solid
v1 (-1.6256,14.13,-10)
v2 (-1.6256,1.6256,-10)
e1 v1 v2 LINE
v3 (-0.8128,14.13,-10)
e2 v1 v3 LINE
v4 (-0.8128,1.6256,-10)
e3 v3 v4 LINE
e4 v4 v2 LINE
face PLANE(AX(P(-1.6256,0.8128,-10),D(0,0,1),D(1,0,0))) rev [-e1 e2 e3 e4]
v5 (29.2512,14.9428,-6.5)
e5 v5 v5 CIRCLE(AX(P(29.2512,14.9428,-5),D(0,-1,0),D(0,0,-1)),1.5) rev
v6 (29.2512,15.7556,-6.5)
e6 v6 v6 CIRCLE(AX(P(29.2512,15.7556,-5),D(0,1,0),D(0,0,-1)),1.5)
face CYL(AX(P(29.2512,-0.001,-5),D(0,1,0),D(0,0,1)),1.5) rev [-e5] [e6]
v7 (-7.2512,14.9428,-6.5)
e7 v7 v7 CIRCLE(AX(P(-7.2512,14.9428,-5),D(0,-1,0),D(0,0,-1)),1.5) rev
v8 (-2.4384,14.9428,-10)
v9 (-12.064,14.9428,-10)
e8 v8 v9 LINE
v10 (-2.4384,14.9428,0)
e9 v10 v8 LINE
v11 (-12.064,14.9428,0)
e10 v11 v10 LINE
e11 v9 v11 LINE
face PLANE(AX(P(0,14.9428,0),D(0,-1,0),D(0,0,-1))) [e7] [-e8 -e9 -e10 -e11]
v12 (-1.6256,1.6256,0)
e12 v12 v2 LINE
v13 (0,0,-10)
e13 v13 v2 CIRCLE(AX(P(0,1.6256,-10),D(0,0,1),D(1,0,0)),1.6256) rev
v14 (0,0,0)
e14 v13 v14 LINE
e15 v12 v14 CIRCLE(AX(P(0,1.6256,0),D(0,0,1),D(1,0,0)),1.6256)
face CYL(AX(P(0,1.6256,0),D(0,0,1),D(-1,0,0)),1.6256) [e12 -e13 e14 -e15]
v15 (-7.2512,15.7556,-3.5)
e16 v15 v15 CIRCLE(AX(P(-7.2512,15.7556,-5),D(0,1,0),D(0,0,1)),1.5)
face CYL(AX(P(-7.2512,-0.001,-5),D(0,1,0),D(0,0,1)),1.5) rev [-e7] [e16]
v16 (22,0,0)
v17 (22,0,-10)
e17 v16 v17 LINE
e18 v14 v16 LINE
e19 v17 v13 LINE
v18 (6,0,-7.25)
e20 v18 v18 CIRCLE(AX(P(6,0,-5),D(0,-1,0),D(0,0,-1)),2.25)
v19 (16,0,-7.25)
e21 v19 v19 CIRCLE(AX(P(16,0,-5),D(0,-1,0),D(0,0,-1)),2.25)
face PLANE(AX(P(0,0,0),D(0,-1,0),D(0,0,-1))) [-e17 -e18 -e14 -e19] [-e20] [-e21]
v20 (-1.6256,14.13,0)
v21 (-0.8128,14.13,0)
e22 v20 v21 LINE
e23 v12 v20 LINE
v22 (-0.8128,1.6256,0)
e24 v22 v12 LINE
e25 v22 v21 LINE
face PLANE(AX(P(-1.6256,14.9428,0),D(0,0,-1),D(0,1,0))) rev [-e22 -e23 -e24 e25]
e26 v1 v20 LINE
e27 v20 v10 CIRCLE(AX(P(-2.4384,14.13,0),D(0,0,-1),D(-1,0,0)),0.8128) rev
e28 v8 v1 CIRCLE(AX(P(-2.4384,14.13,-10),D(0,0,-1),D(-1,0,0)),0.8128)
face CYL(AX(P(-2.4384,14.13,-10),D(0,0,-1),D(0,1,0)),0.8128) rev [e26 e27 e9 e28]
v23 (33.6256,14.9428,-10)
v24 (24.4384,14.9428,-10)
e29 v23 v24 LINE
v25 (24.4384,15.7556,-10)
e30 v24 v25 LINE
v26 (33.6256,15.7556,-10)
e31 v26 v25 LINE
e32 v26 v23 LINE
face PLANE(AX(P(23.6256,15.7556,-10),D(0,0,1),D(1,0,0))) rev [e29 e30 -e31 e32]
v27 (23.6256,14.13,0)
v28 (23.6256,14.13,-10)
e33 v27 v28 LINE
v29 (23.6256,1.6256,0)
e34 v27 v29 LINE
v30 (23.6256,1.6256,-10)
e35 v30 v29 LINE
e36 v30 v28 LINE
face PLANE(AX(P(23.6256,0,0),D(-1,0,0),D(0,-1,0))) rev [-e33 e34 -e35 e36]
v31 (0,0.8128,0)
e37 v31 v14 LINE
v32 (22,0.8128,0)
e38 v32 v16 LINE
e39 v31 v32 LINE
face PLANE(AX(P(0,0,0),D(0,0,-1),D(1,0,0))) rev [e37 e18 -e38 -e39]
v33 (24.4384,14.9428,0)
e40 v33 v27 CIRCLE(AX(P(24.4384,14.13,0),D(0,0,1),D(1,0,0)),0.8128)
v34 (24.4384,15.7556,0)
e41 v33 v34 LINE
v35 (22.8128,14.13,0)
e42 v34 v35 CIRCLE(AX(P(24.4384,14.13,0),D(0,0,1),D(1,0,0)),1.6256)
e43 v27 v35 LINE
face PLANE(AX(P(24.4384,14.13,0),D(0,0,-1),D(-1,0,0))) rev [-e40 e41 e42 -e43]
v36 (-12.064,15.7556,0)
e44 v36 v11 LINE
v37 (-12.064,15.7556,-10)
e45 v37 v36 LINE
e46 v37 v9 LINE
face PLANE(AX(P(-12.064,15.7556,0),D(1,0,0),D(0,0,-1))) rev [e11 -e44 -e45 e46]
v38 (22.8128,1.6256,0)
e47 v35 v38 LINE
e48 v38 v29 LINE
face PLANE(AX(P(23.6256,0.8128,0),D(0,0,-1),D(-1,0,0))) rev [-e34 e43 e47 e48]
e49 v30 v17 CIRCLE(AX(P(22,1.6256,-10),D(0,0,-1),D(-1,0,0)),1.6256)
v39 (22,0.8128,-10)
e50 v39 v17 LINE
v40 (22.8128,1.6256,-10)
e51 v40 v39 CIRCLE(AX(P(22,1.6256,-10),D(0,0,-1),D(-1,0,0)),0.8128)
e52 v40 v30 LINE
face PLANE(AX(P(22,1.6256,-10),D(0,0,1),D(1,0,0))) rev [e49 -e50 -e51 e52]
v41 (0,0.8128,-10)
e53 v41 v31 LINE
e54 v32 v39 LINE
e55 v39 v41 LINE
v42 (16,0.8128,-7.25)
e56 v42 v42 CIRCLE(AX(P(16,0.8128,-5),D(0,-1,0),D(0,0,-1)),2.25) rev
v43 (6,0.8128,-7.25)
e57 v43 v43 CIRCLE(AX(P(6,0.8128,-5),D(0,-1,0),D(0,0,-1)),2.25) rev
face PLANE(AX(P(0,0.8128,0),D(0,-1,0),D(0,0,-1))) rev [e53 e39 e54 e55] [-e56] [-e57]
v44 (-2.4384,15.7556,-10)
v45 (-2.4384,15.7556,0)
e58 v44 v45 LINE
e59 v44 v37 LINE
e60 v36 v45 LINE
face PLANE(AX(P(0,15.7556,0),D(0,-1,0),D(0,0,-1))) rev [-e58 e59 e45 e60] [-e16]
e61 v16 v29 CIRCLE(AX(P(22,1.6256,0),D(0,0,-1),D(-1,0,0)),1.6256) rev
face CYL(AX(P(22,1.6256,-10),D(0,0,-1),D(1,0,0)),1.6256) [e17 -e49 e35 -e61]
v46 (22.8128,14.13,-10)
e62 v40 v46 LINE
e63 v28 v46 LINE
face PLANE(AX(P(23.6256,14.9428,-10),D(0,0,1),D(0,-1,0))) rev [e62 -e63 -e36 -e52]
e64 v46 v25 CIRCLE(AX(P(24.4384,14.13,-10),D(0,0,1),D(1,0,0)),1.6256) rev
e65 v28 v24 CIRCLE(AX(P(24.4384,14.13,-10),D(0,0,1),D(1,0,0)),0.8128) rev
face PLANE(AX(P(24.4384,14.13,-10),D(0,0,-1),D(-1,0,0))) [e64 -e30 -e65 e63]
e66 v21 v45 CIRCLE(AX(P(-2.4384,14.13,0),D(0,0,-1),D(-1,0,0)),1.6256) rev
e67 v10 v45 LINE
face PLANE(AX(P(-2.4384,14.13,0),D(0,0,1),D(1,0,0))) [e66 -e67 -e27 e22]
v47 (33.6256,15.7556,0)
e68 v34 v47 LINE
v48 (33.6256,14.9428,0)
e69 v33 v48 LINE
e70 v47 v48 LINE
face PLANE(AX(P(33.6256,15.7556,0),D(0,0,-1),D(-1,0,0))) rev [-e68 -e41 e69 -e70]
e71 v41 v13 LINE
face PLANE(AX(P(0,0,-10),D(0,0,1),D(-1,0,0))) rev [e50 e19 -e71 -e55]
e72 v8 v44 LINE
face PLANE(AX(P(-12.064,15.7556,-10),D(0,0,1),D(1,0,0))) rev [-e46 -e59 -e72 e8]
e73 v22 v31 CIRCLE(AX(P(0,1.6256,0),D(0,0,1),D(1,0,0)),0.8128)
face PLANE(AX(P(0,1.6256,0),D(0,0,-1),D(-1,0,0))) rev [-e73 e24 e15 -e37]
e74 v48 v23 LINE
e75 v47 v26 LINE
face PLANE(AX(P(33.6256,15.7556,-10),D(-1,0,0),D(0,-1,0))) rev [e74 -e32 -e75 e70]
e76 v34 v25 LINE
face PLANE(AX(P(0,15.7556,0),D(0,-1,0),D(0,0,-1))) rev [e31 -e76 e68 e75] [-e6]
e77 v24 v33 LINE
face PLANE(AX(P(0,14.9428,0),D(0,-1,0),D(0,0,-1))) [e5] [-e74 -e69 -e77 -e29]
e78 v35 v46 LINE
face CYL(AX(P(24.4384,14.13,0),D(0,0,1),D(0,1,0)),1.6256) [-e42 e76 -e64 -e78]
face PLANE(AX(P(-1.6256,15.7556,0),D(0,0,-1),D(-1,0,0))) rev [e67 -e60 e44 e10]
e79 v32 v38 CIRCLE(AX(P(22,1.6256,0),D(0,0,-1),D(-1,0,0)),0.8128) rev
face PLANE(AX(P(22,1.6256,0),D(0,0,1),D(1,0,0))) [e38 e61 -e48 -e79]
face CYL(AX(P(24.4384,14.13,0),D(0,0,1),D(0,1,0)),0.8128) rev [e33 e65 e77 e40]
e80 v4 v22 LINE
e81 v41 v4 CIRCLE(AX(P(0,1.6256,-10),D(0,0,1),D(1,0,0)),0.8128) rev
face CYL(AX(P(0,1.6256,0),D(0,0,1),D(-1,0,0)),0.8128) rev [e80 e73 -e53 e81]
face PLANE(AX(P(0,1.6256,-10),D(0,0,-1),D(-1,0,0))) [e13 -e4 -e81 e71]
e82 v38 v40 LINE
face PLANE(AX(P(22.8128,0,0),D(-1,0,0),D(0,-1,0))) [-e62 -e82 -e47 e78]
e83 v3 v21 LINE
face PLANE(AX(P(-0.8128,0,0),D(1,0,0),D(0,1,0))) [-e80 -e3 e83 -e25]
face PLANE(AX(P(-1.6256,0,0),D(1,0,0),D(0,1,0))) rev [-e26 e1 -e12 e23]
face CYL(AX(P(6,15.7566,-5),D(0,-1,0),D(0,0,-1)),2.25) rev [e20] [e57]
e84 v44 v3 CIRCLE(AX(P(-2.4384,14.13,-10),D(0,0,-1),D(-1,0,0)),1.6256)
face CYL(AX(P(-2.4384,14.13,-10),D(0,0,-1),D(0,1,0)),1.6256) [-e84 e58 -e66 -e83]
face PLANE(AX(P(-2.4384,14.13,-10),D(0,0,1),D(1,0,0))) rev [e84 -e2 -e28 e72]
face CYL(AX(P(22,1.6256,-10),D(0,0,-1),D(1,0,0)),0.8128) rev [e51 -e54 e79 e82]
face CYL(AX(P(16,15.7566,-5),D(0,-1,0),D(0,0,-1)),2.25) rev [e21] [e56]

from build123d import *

# Parameters (mm, degrees)
SKETCH2_W                    = 22
SKETCH2_H                    = 10
BOSS_EXTRUDE1_DEPTH          = 0.8128
EDGE_FLANGE1_DEPTH           = 10
EDGE_FLANGE2_DEPTH           = 10
EDGE_FLANGE3_STRIP_W         = 4.8768
EDGE_FLANGE3_STRIP_H         = 0.8128
EDGE_FLANGE3_STRIP_CUT_DEPTH = 10
EDGE_FLANGE3_DEPTH           = 10
EDGE_FLANGE4_STRIP_W         = 4.8768
EDGE_FLANGE4_STRIP_H         = 0.8128
EDGE_FLANGE4_STRIP_CUT_DEPTH = 10
EDGE_FLANGE4_DEPTH           = 10
CUT_EXTRUDE1_REACH           = 40.457
SKETCH21_R                   = 1.5
CUT_EXTRUDE2_REACH           = 40.457
SKETCH22_R                   = 2.25


# Sheet-metal steps are written as plain solids
with BuildPart() as part:
    # Sketch2 → Boss-Extrude1 (new body)
    with BuildSketch(Plane(origin=(0, 0, 0), x_dir=(1, 0, 0), z_dir=(0, 1, 0))):
        with Locations((11, 5)):
            Rectangle(SKETCH2_W, SKETCH2_H)
    extrude(amount=BOSS_EXTRUDE1_DEPTH)

    # Edge-Flange1 section (across the edge) → Edge-Flange1 (add)
    with BuildSketch(Plane(origin=(-0.8128, 0.8128, -10), x_dir=(1, 0, 0), z_dir=(0, 0, 1))):
        with BuildLine():
            Line((-0.8128, 0.8128), (-0.8128, 14.13))
            Line((-0.8128, 14.13), (0, 14.13))
            Line((0, 14.13), (0, 0.8128))
            ThreePointArc((0, 0.8128), (0.238063608, 0.238063608), (0.8128, 0))
            Line((0.8128, 0), (0.8128, -0.8128))
            ThreePointArc((0.8128, -0.8128), (-0.336672783, -0.336672783), (-0.8128, 0.8128))
        make_face()
    extrude(amount=EDGE_FLANGE1_DEPTH)

    # Edge-Flange2 section (across the edge) → Edge-Flange2 (add)
    with BuildSketch(Plane(origin=(22.8128, 0.8128, 0), x_dir=(-1, 0, 0), z_dir=(0, 0, -1))):
        with BuildLine():
            Line((-0.8128, 0.8128), (-0.8128, 14.13))
            Line((-0.8128, 14.13), (0, 14.13))
            Line((0, 14.13), (0, 0.8128))
            ThreePointArc((0, 0.8128), (0.238063608, 0.238063608), (0.8128, 0))
            Line((0.8128, 0), (0.8128, -0.8128))
            ThreePointArc((0.8128, -0.8128), (-0.336672783, -0.336672783), (-0.8128, 0.8128))
        make_face()
    extrude(amount=EDGE_FLANGE2_DEPTH)

    # Edge-Flange3 strip (across the edge) → Edge-Flange3 strip cut (cut)
    with BuildSketch(Plane(origin=(-1.6256, 14.9428, 0), x_dir=(0, -1, 0), z_dir=(0, 0, -1))):
        with Locations((-1.6256, -0.4064)):
            Rectangle(EDGE_FLANGE3_STRIP_W, EDGE_FLANGE3_STRIP_H)
    extrude(amount=EDGE_FLANGE3_STRIP_CUT_DEPTH, mode=Mode.SUBTRACT)

    # Edge-Flange3 section (across the edge) → Edge-Flange3 (add)
    with BuildSketch(Plane(origin=(-1.6256, 14.9428, 0), x_dir=(0, -1, 0), z_dir=(0, 0, -1))):
        with BuildLine():
            Line((-0.8128, 0.8128), (-0.8128, 10.4384))
            Line((-0.8128, 10.4384), (0, 10.4384))
            Line((0, 10.4384), (0, 0.8128))
            ThreePointArc((0, 0.8128), (0.238063608, 0.238063608), (0.8128, 0))
            Line((0.8128, 0), (0.8128, -0.8128))
            ThreePointArc((0.8128, -0.8128), (-0.336672783, -0.336672783), (-0.8128, 0.8128))
        make_face()
    extrude(amount=EDGE_FLANGE3_DEPTH)

    # Edge-Flange4 strip (across the edge) → Edge-Flange4 strip cut (cut)
    with BuildSketch(Plane(origin=(23.6256, 14.9428, -10), x_dir=(0, -1, 0), z_dir=(0, 0, 1))):
        with Locations((-1.6256, -0.4064)):
            Rectangle(EDGE_FLANGE4_STRIP_W, EDGE_FLANGE4_STRIP_H)
    extrude(amount=EDGE_FLANGE4_STRIP_CUT_DEPTH, mode=Mode.SUBTRACT)

    # Edge-Flange4 section (across the edge) → Edge-Flange4 (add)
    with BuildSketch(Plane(origin=(23.6256, 14.9428, -10), x_dir=(0, -1, 0), z_dir=(0, 0, 1))):
        with BuildLine():
            Line((-0.8128, 0.8128), (-0.8128, 10))
            Line((-0.8128, 10), (0, 10))
            Line((0, 10), (0, 0.8128))
            ThreePointArc((0, 0.8128), (0.238063608, 0.238063608), (0.8128, 0))
            Line((0.8128, 0), (0.8128, -0.8128))
            ThreePointArc((0.8128, -0.8128), (-0.336672783, -0.336672783), (-0.8128, 0.8128))
        make_face()
    extrude(amount=EDGE_FLANGE4_DEPTH)

    # Sketch21 → Cut-Extrude1 (cut, up to next)
    with BuildSketch(Plane(origin=(0, 15.7556, 0), x_dir=(1, 0, 0), z_dir=(0, 1, 0)), mode=Mode.PRIVATE) as cut_extrude1_sk1:
        with Locations(Location((-7.2512, 5, 0), (0, 0, 270))):
            Circle(SKETCH21_R)
    cut_extrude1_tool1 = extrude(cut_extrude1_sk1.sketch, amount=-CUT_EXTRUDE1_REACH, mode=Mode.PRIVATE) & part.part
    # Sketch21 → Cut-Extrude1 (cut, up to next)
    with BuildSketch(Plane(origin=(0, 15.7556, 0), x_dir=(1, 0, 0), z_dir=(0, 1, 0)), mode=Mode.PRIVATE) as cut_extrude1_sk2:
        with Locations(Location((29.2512, 5, 0), (0, 0, 90))):
            Circle(SKETCH21_R)
    cut_extrude1_tool2 = extrude(cut_extrude1_sk2.sketch, amount=-CUT_EXTRUDE1_REACH, mode=Mode.PRIVATE) & part.part
    add(cut_extrude1_tool1.solids().sort_by_distance((-7.2512, 15.7556, -5))[0], mode=Mode.SUBTRACT)
    add(cut_extrude1_tool2.solids().sort_by_distance((29.2512, 15.7556, -5))[0], mode=Mode.SUBTRACT)

    # Sketch22 → Cut-Extrude2 (cut, up to next)
    with BuildSketch(Plane.XZ, mode=Mode.PRIVATE) as cut_extrude2_sk1:
        with Locations(Location((6, -5, 0), (0, 0, 270))):
            Circle(SKETCH22_R)
    cut_extrude2_tool1 = extrude(cut_extrude2_sk1.sketch, amount=-CUT_EXTRUDE2_REACH, mode=Mode.PRIVATE) & part.part
    # Sketch22 → Cut-Extrude2 (cut, up to next)
    with BuildSketch(Plane.XZ, mode=Mode.PRIVATE) as cut_extrude2_sk2:
        with Locations(Location((16, -5, 0), (0, 0, 270))):
            Circle(SKETCH22_R)
    cut_extrude2_tool2 = extrude(cut_extrude2_sk2.sketch, amount=-CUT_EXTRUDE2_REACH, mode=Mode.PRIVATE) & part.part
    add(cut_extrude2_tool1.solids().sort_by_distance((6, 0, -5))[0], mode=Mode.SUBTRACT)
    add(cut_extrude2_tool2.solids().sort_by_distance((16, 0, -5))[0], mode=Mode.SUBTRACT)


solid = part.part
